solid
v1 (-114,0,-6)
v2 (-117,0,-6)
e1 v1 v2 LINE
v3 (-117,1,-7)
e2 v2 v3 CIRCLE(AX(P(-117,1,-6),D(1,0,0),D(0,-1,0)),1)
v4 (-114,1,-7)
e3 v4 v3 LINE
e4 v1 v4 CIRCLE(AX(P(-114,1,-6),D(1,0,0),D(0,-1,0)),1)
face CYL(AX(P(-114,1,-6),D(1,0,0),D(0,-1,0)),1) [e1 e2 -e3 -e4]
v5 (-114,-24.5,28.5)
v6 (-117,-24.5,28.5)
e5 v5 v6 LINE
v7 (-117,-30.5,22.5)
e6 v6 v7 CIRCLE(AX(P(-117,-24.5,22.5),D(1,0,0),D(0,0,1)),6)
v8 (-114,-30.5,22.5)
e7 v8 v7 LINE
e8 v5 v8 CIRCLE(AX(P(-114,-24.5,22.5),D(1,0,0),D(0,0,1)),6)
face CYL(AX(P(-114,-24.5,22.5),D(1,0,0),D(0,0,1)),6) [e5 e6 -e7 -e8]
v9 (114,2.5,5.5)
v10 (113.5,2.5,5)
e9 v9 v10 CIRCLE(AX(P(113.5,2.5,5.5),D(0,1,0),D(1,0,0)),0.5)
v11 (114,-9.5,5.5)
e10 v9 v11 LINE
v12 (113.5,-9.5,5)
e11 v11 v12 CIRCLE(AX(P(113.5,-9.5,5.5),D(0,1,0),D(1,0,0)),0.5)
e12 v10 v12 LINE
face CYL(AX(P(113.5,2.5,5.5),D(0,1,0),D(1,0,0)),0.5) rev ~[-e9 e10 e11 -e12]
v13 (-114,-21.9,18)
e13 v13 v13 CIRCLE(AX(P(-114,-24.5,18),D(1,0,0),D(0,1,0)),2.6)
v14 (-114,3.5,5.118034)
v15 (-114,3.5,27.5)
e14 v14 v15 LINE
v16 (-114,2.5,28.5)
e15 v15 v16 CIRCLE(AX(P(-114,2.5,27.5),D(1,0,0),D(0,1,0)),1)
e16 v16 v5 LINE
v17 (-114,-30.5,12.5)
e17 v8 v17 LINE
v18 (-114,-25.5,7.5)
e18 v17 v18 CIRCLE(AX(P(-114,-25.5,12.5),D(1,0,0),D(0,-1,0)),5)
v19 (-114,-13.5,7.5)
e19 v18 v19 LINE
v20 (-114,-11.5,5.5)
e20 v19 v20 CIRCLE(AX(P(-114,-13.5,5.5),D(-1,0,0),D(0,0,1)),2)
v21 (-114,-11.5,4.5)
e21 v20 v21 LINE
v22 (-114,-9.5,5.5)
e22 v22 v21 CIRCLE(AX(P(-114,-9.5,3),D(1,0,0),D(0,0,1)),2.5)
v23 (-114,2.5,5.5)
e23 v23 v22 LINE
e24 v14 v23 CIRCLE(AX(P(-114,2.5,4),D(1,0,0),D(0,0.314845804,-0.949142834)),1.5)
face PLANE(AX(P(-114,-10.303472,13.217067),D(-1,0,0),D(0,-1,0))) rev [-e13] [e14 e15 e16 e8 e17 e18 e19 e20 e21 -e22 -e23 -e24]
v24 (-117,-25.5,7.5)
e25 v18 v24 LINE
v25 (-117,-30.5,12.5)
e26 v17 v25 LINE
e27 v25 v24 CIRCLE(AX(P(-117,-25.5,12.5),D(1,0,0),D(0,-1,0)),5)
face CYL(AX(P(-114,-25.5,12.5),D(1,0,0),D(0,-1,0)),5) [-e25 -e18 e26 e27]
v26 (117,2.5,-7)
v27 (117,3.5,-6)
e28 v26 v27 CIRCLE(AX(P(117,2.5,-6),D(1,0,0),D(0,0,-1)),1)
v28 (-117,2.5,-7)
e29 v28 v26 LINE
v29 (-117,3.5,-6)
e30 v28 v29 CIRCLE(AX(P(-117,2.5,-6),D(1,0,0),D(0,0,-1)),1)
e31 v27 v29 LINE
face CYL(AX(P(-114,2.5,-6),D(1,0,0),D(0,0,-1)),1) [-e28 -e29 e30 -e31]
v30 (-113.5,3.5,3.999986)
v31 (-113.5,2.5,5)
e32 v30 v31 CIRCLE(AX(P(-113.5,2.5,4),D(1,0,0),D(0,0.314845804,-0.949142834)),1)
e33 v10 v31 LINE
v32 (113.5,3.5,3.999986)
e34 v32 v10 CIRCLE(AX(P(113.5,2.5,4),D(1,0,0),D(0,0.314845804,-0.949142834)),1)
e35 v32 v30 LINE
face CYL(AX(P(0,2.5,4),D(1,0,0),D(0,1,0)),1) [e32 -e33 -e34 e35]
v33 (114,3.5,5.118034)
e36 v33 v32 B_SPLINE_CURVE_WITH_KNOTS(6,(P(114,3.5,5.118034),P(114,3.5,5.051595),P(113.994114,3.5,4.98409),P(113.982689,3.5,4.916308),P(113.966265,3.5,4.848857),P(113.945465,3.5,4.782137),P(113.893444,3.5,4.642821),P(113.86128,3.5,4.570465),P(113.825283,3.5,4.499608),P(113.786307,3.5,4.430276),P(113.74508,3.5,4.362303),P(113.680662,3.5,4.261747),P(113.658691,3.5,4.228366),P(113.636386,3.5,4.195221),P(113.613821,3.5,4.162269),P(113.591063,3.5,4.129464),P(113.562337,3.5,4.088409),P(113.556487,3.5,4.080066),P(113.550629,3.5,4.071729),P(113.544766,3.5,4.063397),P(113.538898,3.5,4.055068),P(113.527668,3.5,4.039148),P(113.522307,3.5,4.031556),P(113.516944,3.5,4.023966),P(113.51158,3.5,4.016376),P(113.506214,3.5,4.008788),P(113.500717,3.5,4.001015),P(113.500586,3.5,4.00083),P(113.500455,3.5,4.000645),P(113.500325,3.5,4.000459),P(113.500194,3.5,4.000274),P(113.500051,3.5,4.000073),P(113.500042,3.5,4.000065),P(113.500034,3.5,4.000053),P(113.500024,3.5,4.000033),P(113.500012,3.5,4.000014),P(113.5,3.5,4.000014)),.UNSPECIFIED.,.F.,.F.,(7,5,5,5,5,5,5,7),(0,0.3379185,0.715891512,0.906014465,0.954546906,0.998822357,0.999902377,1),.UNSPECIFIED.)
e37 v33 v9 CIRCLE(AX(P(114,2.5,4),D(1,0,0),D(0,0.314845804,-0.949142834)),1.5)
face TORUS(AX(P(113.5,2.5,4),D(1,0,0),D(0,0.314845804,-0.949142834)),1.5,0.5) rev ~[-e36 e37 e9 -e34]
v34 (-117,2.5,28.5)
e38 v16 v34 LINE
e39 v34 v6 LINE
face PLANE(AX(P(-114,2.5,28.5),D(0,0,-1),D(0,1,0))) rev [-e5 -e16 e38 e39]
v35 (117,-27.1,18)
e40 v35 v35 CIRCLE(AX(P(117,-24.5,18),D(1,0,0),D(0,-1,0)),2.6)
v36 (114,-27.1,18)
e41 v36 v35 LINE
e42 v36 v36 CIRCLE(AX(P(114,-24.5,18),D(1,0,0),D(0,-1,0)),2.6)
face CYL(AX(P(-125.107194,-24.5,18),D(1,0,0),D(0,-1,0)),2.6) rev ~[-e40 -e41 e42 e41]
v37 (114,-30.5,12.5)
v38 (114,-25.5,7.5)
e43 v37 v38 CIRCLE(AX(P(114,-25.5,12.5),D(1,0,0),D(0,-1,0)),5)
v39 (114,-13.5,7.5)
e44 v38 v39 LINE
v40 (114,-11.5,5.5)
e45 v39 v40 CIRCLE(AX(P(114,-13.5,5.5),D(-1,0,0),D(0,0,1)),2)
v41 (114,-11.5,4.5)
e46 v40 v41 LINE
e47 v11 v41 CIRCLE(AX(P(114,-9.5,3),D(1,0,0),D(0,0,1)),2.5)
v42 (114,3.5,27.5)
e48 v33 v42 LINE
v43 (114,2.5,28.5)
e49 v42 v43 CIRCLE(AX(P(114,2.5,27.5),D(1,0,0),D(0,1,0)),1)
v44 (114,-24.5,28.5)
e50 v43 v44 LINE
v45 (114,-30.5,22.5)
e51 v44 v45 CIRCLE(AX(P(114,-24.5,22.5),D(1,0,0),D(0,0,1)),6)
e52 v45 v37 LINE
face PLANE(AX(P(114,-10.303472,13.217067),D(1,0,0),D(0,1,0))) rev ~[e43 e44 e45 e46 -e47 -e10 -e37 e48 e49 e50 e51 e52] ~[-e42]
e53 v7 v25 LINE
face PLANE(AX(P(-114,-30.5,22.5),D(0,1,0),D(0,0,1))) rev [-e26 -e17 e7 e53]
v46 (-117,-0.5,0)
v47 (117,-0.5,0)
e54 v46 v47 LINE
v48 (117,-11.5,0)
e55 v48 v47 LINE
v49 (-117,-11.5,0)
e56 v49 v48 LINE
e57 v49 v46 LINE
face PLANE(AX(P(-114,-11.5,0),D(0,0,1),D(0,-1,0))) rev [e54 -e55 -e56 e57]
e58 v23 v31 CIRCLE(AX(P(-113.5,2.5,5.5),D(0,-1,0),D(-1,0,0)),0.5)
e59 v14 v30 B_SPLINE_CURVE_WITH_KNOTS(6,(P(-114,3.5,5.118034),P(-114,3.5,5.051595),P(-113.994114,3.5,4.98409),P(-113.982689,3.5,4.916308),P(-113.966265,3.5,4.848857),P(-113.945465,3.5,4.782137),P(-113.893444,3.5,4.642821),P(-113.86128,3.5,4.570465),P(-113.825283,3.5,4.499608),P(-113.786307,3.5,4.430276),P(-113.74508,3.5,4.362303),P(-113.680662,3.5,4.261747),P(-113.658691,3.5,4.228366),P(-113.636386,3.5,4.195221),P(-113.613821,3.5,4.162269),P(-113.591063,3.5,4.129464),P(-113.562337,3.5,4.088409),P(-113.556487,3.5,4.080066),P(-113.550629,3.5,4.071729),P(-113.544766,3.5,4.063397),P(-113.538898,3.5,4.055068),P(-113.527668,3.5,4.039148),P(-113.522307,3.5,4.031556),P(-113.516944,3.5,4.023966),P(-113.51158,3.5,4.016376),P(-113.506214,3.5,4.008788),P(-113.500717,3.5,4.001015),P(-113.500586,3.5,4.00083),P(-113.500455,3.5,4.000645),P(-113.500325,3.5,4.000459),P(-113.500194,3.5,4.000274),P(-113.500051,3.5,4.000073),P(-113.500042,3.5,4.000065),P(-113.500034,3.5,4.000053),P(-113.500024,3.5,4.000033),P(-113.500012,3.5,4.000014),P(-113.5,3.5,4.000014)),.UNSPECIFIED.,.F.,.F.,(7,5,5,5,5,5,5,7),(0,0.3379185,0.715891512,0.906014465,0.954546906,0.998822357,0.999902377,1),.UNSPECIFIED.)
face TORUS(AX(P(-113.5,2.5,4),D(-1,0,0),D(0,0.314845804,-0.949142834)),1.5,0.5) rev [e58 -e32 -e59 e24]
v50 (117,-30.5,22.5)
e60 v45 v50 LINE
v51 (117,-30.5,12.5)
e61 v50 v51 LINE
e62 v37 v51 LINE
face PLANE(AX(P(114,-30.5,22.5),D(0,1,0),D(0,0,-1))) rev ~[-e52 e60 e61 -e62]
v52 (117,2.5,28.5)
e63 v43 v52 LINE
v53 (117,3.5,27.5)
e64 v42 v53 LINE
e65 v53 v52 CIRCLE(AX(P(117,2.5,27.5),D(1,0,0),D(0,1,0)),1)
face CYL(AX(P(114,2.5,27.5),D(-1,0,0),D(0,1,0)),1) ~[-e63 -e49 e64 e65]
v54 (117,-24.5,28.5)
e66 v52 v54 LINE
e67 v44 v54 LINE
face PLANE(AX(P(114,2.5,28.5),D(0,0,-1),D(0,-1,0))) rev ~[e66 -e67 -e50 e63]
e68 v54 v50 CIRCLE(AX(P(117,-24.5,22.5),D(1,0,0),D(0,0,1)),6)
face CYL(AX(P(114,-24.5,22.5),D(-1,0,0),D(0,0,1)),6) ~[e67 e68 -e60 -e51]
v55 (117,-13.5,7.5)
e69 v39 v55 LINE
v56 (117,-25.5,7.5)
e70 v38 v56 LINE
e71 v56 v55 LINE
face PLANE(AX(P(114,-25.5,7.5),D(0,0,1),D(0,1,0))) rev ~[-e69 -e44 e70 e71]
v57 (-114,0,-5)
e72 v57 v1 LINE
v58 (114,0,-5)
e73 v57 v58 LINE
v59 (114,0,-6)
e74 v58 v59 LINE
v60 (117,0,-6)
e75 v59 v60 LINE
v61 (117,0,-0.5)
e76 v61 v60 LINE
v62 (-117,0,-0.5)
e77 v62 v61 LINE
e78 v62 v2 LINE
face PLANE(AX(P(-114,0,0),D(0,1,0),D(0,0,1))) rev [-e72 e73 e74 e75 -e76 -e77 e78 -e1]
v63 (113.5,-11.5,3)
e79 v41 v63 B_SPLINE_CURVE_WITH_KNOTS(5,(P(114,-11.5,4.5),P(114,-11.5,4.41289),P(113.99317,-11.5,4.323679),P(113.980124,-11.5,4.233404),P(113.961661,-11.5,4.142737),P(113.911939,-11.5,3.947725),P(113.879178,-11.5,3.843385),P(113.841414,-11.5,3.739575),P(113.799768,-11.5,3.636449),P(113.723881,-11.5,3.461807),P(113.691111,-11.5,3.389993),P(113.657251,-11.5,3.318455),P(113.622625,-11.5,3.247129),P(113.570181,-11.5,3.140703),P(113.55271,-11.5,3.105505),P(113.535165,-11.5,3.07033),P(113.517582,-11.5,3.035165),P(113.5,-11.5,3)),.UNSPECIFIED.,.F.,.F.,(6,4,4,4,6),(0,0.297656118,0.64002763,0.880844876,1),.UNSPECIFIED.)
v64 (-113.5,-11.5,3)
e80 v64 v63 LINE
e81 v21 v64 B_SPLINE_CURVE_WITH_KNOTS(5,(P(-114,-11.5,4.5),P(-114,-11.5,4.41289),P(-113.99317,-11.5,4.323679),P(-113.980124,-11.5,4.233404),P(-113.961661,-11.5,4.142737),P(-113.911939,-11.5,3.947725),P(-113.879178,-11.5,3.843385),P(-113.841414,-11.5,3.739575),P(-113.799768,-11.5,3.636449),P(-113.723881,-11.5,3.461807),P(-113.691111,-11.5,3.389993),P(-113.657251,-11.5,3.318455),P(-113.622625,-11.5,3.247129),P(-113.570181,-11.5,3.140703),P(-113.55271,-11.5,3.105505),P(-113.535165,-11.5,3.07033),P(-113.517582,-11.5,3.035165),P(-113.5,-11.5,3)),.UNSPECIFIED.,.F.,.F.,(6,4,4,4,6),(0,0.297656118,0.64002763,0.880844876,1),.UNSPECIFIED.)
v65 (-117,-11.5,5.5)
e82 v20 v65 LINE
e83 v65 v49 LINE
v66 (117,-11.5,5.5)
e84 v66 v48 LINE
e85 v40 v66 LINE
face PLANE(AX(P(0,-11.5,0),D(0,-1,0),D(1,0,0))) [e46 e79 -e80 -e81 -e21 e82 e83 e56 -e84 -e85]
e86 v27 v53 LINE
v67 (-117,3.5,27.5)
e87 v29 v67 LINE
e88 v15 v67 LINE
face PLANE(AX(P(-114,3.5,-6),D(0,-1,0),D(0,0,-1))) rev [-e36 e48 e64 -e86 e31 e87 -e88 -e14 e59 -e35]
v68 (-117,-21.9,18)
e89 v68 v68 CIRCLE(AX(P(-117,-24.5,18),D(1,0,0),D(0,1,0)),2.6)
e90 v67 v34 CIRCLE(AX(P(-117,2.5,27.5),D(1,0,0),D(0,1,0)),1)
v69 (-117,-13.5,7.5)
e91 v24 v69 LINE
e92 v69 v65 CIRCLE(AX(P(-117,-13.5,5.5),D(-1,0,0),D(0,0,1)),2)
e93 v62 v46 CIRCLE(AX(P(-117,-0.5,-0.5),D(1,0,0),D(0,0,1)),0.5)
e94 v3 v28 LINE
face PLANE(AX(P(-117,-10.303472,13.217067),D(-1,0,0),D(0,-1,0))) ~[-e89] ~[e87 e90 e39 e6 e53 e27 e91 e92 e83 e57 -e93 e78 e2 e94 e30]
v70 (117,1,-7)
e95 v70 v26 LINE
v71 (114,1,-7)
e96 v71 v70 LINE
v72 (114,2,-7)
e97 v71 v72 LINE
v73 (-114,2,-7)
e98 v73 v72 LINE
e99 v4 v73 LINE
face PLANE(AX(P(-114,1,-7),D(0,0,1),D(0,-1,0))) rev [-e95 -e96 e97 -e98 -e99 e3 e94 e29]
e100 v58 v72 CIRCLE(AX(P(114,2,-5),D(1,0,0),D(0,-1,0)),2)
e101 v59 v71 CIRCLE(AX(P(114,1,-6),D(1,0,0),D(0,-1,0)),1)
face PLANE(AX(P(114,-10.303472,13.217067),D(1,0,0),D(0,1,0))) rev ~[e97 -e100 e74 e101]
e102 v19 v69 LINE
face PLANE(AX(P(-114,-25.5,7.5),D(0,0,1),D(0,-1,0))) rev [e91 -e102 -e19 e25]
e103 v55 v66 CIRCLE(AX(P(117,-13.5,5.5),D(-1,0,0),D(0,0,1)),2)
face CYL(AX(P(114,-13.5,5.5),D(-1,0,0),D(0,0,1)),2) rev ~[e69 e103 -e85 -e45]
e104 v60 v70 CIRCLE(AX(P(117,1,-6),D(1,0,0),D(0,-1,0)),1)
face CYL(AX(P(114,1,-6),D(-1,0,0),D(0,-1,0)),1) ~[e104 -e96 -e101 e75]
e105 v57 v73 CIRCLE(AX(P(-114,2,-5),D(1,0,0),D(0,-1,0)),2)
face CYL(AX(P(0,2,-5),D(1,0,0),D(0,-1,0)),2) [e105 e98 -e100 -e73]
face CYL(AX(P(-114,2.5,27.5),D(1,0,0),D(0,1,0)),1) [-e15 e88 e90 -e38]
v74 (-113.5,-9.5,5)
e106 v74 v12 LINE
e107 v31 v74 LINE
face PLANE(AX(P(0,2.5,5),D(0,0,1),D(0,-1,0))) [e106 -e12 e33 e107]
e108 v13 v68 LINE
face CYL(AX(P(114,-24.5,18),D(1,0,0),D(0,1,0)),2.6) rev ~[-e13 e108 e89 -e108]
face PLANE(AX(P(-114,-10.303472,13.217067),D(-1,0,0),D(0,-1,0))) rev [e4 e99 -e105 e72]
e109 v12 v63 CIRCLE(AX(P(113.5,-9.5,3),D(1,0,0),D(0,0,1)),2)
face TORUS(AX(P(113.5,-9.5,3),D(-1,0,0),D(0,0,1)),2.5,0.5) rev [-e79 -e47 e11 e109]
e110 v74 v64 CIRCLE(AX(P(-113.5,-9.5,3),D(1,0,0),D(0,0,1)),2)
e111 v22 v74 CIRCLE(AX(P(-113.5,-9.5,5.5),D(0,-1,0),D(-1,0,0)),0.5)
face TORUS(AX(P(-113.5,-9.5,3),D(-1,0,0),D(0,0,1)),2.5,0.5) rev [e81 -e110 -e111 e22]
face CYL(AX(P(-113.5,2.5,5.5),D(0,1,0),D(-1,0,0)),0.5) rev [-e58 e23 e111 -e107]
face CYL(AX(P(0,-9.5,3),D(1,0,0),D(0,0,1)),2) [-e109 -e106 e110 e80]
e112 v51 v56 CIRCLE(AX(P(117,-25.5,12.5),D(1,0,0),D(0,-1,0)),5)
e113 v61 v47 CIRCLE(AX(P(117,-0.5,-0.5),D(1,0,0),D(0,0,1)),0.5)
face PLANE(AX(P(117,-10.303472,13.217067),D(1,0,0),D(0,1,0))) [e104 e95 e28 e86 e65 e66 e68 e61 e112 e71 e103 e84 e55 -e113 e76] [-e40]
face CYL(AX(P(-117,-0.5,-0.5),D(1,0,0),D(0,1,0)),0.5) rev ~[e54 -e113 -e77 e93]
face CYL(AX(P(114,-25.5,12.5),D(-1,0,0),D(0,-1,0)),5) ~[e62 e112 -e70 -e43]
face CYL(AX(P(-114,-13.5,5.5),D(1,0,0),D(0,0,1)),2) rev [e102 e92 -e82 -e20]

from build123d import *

# Parameters (mm, degrees)
F1_DEPTH     = 114
F3_DEPTH     = 3
F5_R         = 0.5
F6_D         = 5.2
F6_DEPTH     = 231.001
F7_D         = 5.2
F8_T1_DEPTH  = 12
F8_T6_ANGLE  = 161.6484946187
F8_T11_ANGLE = 150.9012204259
F8_T16_ANGLE = 150.9012204259
F8_T21_ANGLE = 161.6484946187


# Not quite as in the source:
# - a fillet or chamfer that OpenCascade refuses, or shapes differently, is made with other operations: its cross-section is extruded or revolved along the edge and cut away or added


with BuildPart() as f1:
    # F0 (on Right) → F1 (new body, symmetric)
    with BuildSketch(Plane.YZ):
        with BuildLine():
            Line((2.5, 5), (-9.5, 5))
            ThreePointArc((-9.5, 5), (-10.9142135624, 4.4142135624), (-11.5, 3))
            Line((-11.5, 3), (-11.5, 0))
            Line((-11.5, 0), (0, 0))
            Line((0, 0), (3.5, 0))
            Line((3.5, 0), (3.5, 4))
            ThreePointArc((3.5, 4), (3.2071067812, 4.7071067812), (2.5, 5))
        make_face()
        with BuildLine():
            Line((3.5, -6), (3.5, 0))
            Line((3.5, 0), (0, 0))
            Line((0, 0), (0, -5))
            ThreePointArc((0, -5), (0.5857864376, -6.4142135624), (2, -7))
            Line((2, -7), (2.5, -7))
            ThreePointArc((2.5, -7), (3.2071067812, -6.7071067812), (3.5, -6))
        make_face()
    extrude(amount=F1_DEPTH, both=True)

    # F2 (on face) → F3 (join)
    with BuildSketch(Plane.YZ.offset(114)):
        with BuildLine():
            Line((2.5, 28.5), (-24.5, 28.5))
            ThreePointArc((-24.5, 28.5), (-28.7426406871, 26.7426406871), (-30.5, 22.5))
            Line((-30.5, 22.5), (-30.5, 12.5))
            ThreePointArc((-30.5, 12.5), (-29.0355339059, 8.9644660941), (-25.5, 7.5))
            Line((-25.5, 7.5), (-13.5, 7.5))
            ThreePointArc((-13.5, 7.5), (-12.0857864376, 6.9142135624), (-11.5, 5.5))
            Line((-11.5, 5.5), (-11.5, 0))
            Line((-11.5, 0), (0, 0))
            Line((0, 0), (0, -6))
            ThreePointArc((0, -6), (0.2928932188, -6.7071067812), (1, -7))
            Line((1, -7), (2.5, -7))
            ThreePointArc((2.5, -7), (3.2071067812, -6.7071067812), (3.5, -6))
            Line((3.5, -6), (3.5, 7.5))
            Line((3.5, 7.5), (3.5, 27.5))
            ThreePointArc((3.5, 27.5), (3.2071067812, 28.2071067812), (2.5, 28.5))
        make_face()
    extrude(amount=F3_DEPTH)

    # F4: F1 across plane


with BuildPart() as f1_1:
    add(f1.part)
    add(f1.part.mirror(Plane.YZ))

    # F5
    f5_edges = [f1_1.edges().sort_by_distance(p)[0] for p in [
        (0, 0, 0),
    ]]
    fillet(f5_edges, radius=F5_R)

    # F6 (through all, one way)
    with BuildSketch(Plane.YZ.offset(114)):
        with Locations((-24.5, 18)):
            Circle(F6_D / 2)
    extrude(amount=-F6_DEPTH, mode=Mode.SUBTRACT)

    # F7 (through all)
    with Locations(Plane(origin=(114, 0, 0), x_dir=(0, 1, 0), z_dir=(-1, 0, 0))):
        with Locations((-24.5, -18)):
            Hole(F7_D / 2)

    # F8: fillet of radius 0.5 on 6 edges, made by hand

    # F8_s2 → F8_t1 (join)
    with BuildSketch(Plane.XZ.offset(-2.5)):
        with BuildLine():
            ThreePointArc((-114, 5.5), (-113.8535533906, 5.1464466094), (-113.5, 5))
            Line((-113.5, 5), (-114, 5))
            Line((-114, 5), (-114, 5.5))
        make_face()
        with BuildLine():
            ThreePointArc((114, 5.5), (113.8535533906, 5.1464466094), (113.5, 5))
            Line((113.5, 5), (114, 5))
            Line((114, 5), (114, 5.5))
        make_face()
    extrude(amount=F8_T1_DEPTH)


with BuildPart() as f8_tool4:
    # F8_s5 → F8_t6 (revolve)
    with BuildSketch(Plane(origin=(0, 3.4475148544, 1.1435956184), x_dir=(1, 0, 0), z_dir=(0, -0.9491428342, -0.3148458041))):
        with BuildLine():
            ThreePointArc((-114, 1.5094568264), (-113.8535533906, 1.863010217), (-113.5, 2.0094568264))
            Line((-113.5, 2.0094568264), (-114, 2.0094568264))
            Line((-114, 2.0094568264), (-114, 1.5094568264))
        make_face()
    revolve(axis=Axis((-114, 2.5, 4), (1, 0, 0)), revolution_arc=F8_T6_ANGLE)

    split(bisect_by=Plane.XZ.offset(-3.5), keep=Keep.TOP)


with BuildPart() as f1_2:
    add(f1_1.part)

    # F8_t3: union F8_tool4
    add(f8_tool4.part)


with BuildPart() as f8_tool9:
    # F8_s10 → F8_t11 (revolve)
    with BuildSketch(Plane.XZ.offset(9.5)):
        with BuildLine():
            ThreePointArc((-114, 5.5), (-113.8535533906, 5.1464466094), (-113.5, 5))
            Line((-113.5, 5), (-114, 5))
            Line((-114, 5), (-114, 5.5))
        make_face()
    revolve(axis=Axis((-114, -9.5, 3), (1, 0, 0)), revolution_arc=F8_T11_ANGLE)

    split(bisect_by=Plane.XZ.offset(11.5), keep=Keep.BOTTOM)


with BuildPart() as f1_3:
    add(f1_2.part)

    # F8_t8: union F8_tool9
    add(f8_tool9.part)


with BuildPart() as f8_tool14:
    # F8_s15 → F8_t16 (revolve)
    with BuildSketch(Plane.XZ.offset(9.5)):
        with BuildLine():
            ThreePointArc((113.5, 5), (113.8535533906, 5.1464466094), (114, 5.5))
            Line((114, 5.5), (114, 5))
            Line((114, 5), (113.5, 5))
        make_face()
    revolve(axis=Axis((114, -9.5, 3), (1, 0, 0)), revolution_arc=F8_T16_ANGLE)

    split(bisect_by=Plane.XZ.offset(11.5), keep=Keep.BOTTOM)


with BuildPart() as f1_4:
    add(f1_3.part)

    # F8_t13: union F8_tool14
    add(f8_tool14.part)


with BuildPart() as f8_tool19:
    # F8_s20 → F8_t21 (revolve)
    with BuildSketch(Plane(origin=(0, 3.4475148544, 1.1435956184), x_dir=(1, 0, 0), z_dir=(0, -0.9491428342, -0.3148458041))):
        with BuildLine():
            ThreePointArc((114, 1.5094568264), (113.8535533906, 1.863010217), (113.5, 2.0094568264))
            Line((113.5, 2.0094568264), (114, 2.0094568264))
            Line((114, 2.0094568264), (114, 1.5094568264))
        make_face()
    revolve(axis=Axis((114, 2.5, 4), (1, 0, 0)), revolution_arc=F8_T21_ANGLE)

    split(bisect_by=Plane.XZ.offset(-3.5), keep=Keep.TOP)


with BuildPart() as f1_5:
    add(f1_4.part)

    # F8_t18: union F8_tool19
    add(f8_tool19.part)


solid = f1_5.part
